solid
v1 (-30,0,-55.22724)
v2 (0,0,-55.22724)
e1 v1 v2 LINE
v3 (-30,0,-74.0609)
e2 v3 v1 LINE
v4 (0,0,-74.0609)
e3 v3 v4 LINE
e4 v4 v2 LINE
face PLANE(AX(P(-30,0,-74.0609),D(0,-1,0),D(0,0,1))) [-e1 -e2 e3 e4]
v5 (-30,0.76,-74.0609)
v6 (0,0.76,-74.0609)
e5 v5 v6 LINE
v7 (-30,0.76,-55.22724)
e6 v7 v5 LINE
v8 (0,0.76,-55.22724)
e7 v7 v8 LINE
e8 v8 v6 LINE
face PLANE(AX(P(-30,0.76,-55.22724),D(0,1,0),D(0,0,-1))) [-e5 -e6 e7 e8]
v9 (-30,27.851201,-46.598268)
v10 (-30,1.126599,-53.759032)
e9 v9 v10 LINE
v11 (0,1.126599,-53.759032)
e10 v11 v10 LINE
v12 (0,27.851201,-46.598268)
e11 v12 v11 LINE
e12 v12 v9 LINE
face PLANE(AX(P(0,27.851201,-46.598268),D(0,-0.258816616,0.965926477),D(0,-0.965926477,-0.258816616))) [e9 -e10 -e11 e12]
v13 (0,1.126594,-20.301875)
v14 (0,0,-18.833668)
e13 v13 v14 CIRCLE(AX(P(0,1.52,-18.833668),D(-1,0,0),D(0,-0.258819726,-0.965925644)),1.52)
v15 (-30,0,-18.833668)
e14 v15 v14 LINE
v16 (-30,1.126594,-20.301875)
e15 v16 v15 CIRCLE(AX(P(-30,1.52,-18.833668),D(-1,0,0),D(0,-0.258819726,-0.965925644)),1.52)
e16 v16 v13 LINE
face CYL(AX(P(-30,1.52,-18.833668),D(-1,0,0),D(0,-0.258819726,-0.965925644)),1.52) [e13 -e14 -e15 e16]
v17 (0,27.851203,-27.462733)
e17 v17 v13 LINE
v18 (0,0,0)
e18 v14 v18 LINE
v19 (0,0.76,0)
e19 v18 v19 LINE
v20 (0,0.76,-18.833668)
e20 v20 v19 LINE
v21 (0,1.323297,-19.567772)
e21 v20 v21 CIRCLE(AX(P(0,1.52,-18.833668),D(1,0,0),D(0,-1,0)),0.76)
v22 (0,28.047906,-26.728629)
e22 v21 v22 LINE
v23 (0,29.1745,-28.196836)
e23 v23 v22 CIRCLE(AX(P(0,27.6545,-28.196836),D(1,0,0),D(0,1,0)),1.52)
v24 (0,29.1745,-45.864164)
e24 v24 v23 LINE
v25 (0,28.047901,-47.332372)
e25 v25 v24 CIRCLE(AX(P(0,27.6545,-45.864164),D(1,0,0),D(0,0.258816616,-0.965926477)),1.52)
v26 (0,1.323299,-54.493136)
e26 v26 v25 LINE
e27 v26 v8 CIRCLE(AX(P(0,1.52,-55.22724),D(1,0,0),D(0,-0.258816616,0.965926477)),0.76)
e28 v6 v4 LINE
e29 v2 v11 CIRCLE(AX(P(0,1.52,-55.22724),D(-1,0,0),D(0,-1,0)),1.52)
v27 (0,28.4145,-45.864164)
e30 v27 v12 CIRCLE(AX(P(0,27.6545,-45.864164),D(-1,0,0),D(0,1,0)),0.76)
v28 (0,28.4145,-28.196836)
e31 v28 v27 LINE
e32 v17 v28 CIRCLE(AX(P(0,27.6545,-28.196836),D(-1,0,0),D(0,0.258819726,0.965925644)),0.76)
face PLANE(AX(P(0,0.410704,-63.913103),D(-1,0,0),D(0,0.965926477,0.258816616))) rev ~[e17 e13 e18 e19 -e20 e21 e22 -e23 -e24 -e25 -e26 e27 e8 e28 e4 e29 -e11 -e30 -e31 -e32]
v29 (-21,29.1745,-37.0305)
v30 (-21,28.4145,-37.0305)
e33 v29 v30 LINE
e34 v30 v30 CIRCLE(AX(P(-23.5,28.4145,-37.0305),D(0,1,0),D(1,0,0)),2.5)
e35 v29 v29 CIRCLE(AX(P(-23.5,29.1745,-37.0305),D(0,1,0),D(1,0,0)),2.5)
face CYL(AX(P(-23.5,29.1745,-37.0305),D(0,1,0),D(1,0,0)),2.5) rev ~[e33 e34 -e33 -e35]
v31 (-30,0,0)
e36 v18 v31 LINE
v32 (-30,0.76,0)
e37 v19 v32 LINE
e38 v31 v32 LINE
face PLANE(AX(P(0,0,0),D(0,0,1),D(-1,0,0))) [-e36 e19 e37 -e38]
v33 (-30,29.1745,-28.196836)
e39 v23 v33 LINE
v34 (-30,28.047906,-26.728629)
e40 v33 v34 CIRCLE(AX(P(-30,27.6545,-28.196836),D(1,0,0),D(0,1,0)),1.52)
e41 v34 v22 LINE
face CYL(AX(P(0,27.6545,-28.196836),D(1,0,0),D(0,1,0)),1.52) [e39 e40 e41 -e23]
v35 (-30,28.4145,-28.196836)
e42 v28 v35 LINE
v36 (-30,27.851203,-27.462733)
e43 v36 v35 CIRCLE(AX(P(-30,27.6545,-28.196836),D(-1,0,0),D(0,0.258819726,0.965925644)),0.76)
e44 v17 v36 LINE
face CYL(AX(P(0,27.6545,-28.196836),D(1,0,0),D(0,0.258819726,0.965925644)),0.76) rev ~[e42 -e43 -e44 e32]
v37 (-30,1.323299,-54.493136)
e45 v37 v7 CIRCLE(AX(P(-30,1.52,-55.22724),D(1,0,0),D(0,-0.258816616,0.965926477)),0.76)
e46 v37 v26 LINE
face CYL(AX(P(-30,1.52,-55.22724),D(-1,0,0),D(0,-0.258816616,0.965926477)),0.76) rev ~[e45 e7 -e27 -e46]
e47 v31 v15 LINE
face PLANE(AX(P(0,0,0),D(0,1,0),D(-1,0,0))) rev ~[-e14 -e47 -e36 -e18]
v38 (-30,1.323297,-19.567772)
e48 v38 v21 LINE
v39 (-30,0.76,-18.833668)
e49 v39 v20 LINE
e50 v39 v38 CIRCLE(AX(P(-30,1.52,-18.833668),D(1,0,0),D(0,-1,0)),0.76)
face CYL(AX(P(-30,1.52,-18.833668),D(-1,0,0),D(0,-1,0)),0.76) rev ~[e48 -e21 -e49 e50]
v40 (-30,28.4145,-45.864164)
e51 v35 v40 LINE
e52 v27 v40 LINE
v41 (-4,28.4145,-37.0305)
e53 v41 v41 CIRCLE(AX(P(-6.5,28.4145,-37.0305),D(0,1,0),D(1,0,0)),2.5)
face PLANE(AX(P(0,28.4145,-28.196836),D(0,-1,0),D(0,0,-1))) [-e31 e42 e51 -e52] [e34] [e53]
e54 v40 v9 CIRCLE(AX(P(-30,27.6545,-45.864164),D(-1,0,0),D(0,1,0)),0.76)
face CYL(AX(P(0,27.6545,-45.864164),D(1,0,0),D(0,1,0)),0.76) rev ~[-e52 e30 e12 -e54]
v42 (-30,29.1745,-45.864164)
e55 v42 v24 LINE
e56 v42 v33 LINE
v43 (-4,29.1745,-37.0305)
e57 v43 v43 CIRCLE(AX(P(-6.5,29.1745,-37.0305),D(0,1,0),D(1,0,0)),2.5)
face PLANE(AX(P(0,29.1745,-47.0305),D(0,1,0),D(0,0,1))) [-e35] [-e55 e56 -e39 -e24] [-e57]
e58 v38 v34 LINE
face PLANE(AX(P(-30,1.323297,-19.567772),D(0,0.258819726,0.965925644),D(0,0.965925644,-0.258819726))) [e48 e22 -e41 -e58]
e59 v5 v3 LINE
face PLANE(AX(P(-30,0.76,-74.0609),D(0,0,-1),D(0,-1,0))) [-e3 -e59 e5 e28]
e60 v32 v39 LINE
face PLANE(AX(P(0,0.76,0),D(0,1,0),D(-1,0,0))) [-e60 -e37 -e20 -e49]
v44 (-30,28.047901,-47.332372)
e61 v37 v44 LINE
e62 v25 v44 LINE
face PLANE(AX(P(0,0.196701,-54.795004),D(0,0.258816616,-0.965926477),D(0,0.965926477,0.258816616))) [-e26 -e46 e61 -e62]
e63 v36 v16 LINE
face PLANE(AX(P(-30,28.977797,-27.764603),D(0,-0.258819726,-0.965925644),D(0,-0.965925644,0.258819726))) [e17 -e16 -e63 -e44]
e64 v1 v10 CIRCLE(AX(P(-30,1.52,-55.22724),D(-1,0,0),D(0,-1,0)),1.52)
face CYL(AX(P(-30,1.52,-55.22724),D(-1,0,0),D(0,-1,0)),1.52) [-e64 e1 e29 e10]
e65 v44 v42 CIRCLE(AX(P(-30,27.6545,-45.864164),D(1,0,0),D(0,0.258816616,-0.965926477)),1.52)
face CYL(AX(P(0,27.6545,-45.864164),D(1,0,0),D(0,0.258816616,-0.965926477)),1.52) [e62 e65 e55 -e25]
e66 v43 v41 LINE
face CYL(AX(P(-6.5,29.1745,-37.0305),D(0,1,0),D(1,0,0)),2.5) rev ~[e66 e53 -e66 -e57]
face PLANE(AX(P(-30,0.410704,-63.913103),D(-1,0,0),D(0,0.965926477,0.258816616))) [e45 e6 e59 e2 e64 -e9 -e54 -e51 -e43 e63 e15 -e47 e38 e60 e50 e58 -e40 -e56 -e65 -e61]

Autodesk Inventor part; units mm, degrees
ref_plane "YZ Plane" through (0, 0, 0) normal (1, 0, 0) x (0, 1, 0)
ref_plane "XZ Plane" through (0, 0, 0) normal (0, 1, 0) x (-1, 0, 0)
ref_plane "XY Plane" through (0, 0, 0) normal (0, 0, 1) x (1, 0, 0)
sketch "Boceto1" plane through (0, 0, 0) normal (0, 1, 0) x (-1, 0, 0)
  point P0 (0, 0)
sketch "Boceto2" plane through (0, 0, 0) normal (0, 1, 0) x (-1, 0, 0)
  line L0 (0, 0) -> (30, 0)
  line L1 (30, 0) -> (30, -20)
  line L2 (30, -20) -> (0, -20)
  line L3 (0, -20) -> (0, 0)
  dimension "d0" = 30
  dimension "d1" = 20
extrude "Placa1" add sketch "Boceto2" along normal blind 0.76
sketch "Boceto3" plane through (0, 0.1967, -19.2659) normal (0, -0.258819, -0.9659258) x (-1, 0, 0)
  line L0 (30, 0) -> (0, 0)
  line L1 (0, 0) -> (0, -30)
  line L2 (0, -30) -> (30, -30)
  line L3 (30, -30) -> (30, 0)
edge flange "Pestaña1" height 30 angle -75 thickness 0.76 bend radius 0.76 thickness toward (0, -0.258819, -0.9659258) relief tear relief width 0.76 relief depth 0.38 edges at (-15, 0, -20) wall of the first edge with corners at (-30, 0.1967, -19.2659) (0, 0.1967, -19.2659) (0, 29.1745, -27.0305) (-30, 29.1745, -27.0305)
bend "Doblez1"
corner "Esquina1"
sketch "Boceto4" plane through (-30, 28.4145, -27.0305) normal (0, 1, 0) x (-1, 0, 0)
  line L0 (-30, 0) -> (0, 0)
  line L1 (0, 0) -> (0, 20)
  line L2 (0, 20) -> (-30, 20)
  line L3 (-30, 20) -> (-30, 0)
edge flange "Pestaña2" height 20 angle -75 thickness 0.76 bend radius 0.76 thickness toward (0, 1, 0) relief tear relief width 0.76 relief depth 0.38 edges at (-15, 29.1745, -27.0305) wall of the first edge with corners at (0, 28.4145, -27.0305) (-30, 28.4145, -27.0305) (-30, 28.4145, -47.0305) (0, 28.4145, -47.0305)
bend "Doblez2"
corner "Esquina2"
sketch "Boceto5" plane through (-30, 28.9778, -46.2964) normal (0, 0.258819, -0.9659258) x (1, 0, 0)
  line L0 (30, 0) -> (0, 0)
  line L1 (0, 0) -> (0, -30)
  line L2 (0, -30) -> (30, -30)
  line L3 (30, -30) -> (30, 0)
edge flange "Pestaña3" height 30 angle -75 thickness 0.76 bend radius 0.76 thickness toward (0, 0.258819, -0.9659258) relief tear relief width 0.76 relief depth 0.38 edges at (-15, 29.1745, -47.0305) wall of the first edge with corners at (0, 28.9778, -46.2964) (-30, 28.9778, -46.2964) (-30, 0, -54.0609) (0, 0, -54.0609)
bend "Doblez3"
corner "Esquina3"
sketch "Boceto6" plane through (0, 0.76, -54.0609) normal (0, -1, 0) x (1, 0, 0)
  line L0 (-30, 0) -> (0, 0)
  line L1 (0, 0) -> (0, 20)
  line L2 (0, 20) -> (-30, 20)
  line L3 (-30, 20) -> (-30, 0)
edge flange "Pestaña4" height 20 angle -75 thickness 0.76 bend radius 0.76 thickness toward (0, -1, 0) relief tear relief width 0.76 relief depth 0.38 edges at (-15, 0, -54.0609) wall of the first edge with corners at (-30, 0.76, -54.0609) (0, 0.76, -54.0609) (0, 0.76, -74.0609) (-30, 0.76, -74.0609)
bend "Doblez4"
corner "Esquina4"
sketch "Boceto7" plane through (-30, 29.1745, -28.1968) normal (0, 1, 0) x (1, 0, 0)
  circle A0 centre (6.5, 8.8337) radius 2.5
  circle A1 centre (23.5, 8.8337) radius 2.5
  line L0 (0, 0) -> (0, 17.6673) projected
  line L1 (30, 0) -> (30, 17.6673) projected
  point P0 (30, -28.1968)
  dimension "d43" = 5
  dimension "d44" = 5
  dimension "d45" = 6.5
  dimension "d46" = 6.5
extrude "Extrusión1" cut sketch "Boceto7" against normal through all
equation "\"d46\" = d45"
equation "\"d2\" = Grosor"
equation "\"d3\" = Anchura_desahogo_plegado"
equation "\"d4\" = Profundidad_desahogo_plegado"
equation "\"d5\" = Remanente_mínimo"
equation "\"d6\" = Radiodetransición"
equation "\"d9\" = Radio_pliegue"
equation "\"d10\" = Tamaño_destalonado"
equation "\"d11\" = TamañoSeparación"
equation "\"d12\" = Tamaño_de_radio_de_Jacobi"
equation "\"d13\" = Anchura_desahogo_plegado"
equation "\"d14\" = Profundidad_desahogo_plegado"
equation "\"d15\" = Remanente_mínimo"
equation "\"d16\" = Radiodetransición"
equation "\"d19\" = Radio_pliegue"
equation "\"d20\" = Tamaño_destalonado"
equation "\"d21\" = TamañoSeparación"
equation "\"d22\" = Tamaño_de_radio_de_Jacobi"
equation "\"d23\" = Anchura_desahogo_plegado"
equation "\"d24\" = Profundidad_desahogo_plegado"
equation "\"d25\" = Remanente_mínimo"
equation "\"d26\" = Radiodetransición"
equation "\"d29\" = Radio_pliegue"
equation "\"d30\" = Tamaño_destalonado"
equation "\"d31\" = TamañoSeparación"
equation "\"d32\" = Tamaño_de_radio_de_Jacobi"
equation "\"d33\" = Anchura_desahogo_plegado"
equation "\"d34\" = Profundidad_desahogo_plegado"
equation "\"d35\" = Remanente_mínimo"
equation "\"d36\" = Radiodetransición"
equation "\"d39\" = Radio_pliegue"
equation "\"d40\" = Tamaño_destalonado"
equation "\"d41\" = TamañoSeparación"
equation "\"d42\" = Tamaño_de_radio_de_Jacobi"
equation "\"Radio_pliegue\" = Grosor"
equation "\"Anchura_desahogo_plegado\" = Grosor"
equation "\"Profundidad_desahogo_plegado\" = 0.5 * Grosor"
equation "\"Tamaño_destalonado\" = 4 * Grosor"
equation "\"Remanente_mínimo\" = 2 * Grosor"
equation "\"Radiodetransición\" = Radio_pliegue"
equation "\"Tamaño_de_radio_de_Jacobi\" = Radio_pliegue"
equation "\"TamañoSeparación\" = Grosor"
equation "\"Grosor\" = 0.76"
properties part number "placa tierra" material "Acero AISI 1006 85 LC"
